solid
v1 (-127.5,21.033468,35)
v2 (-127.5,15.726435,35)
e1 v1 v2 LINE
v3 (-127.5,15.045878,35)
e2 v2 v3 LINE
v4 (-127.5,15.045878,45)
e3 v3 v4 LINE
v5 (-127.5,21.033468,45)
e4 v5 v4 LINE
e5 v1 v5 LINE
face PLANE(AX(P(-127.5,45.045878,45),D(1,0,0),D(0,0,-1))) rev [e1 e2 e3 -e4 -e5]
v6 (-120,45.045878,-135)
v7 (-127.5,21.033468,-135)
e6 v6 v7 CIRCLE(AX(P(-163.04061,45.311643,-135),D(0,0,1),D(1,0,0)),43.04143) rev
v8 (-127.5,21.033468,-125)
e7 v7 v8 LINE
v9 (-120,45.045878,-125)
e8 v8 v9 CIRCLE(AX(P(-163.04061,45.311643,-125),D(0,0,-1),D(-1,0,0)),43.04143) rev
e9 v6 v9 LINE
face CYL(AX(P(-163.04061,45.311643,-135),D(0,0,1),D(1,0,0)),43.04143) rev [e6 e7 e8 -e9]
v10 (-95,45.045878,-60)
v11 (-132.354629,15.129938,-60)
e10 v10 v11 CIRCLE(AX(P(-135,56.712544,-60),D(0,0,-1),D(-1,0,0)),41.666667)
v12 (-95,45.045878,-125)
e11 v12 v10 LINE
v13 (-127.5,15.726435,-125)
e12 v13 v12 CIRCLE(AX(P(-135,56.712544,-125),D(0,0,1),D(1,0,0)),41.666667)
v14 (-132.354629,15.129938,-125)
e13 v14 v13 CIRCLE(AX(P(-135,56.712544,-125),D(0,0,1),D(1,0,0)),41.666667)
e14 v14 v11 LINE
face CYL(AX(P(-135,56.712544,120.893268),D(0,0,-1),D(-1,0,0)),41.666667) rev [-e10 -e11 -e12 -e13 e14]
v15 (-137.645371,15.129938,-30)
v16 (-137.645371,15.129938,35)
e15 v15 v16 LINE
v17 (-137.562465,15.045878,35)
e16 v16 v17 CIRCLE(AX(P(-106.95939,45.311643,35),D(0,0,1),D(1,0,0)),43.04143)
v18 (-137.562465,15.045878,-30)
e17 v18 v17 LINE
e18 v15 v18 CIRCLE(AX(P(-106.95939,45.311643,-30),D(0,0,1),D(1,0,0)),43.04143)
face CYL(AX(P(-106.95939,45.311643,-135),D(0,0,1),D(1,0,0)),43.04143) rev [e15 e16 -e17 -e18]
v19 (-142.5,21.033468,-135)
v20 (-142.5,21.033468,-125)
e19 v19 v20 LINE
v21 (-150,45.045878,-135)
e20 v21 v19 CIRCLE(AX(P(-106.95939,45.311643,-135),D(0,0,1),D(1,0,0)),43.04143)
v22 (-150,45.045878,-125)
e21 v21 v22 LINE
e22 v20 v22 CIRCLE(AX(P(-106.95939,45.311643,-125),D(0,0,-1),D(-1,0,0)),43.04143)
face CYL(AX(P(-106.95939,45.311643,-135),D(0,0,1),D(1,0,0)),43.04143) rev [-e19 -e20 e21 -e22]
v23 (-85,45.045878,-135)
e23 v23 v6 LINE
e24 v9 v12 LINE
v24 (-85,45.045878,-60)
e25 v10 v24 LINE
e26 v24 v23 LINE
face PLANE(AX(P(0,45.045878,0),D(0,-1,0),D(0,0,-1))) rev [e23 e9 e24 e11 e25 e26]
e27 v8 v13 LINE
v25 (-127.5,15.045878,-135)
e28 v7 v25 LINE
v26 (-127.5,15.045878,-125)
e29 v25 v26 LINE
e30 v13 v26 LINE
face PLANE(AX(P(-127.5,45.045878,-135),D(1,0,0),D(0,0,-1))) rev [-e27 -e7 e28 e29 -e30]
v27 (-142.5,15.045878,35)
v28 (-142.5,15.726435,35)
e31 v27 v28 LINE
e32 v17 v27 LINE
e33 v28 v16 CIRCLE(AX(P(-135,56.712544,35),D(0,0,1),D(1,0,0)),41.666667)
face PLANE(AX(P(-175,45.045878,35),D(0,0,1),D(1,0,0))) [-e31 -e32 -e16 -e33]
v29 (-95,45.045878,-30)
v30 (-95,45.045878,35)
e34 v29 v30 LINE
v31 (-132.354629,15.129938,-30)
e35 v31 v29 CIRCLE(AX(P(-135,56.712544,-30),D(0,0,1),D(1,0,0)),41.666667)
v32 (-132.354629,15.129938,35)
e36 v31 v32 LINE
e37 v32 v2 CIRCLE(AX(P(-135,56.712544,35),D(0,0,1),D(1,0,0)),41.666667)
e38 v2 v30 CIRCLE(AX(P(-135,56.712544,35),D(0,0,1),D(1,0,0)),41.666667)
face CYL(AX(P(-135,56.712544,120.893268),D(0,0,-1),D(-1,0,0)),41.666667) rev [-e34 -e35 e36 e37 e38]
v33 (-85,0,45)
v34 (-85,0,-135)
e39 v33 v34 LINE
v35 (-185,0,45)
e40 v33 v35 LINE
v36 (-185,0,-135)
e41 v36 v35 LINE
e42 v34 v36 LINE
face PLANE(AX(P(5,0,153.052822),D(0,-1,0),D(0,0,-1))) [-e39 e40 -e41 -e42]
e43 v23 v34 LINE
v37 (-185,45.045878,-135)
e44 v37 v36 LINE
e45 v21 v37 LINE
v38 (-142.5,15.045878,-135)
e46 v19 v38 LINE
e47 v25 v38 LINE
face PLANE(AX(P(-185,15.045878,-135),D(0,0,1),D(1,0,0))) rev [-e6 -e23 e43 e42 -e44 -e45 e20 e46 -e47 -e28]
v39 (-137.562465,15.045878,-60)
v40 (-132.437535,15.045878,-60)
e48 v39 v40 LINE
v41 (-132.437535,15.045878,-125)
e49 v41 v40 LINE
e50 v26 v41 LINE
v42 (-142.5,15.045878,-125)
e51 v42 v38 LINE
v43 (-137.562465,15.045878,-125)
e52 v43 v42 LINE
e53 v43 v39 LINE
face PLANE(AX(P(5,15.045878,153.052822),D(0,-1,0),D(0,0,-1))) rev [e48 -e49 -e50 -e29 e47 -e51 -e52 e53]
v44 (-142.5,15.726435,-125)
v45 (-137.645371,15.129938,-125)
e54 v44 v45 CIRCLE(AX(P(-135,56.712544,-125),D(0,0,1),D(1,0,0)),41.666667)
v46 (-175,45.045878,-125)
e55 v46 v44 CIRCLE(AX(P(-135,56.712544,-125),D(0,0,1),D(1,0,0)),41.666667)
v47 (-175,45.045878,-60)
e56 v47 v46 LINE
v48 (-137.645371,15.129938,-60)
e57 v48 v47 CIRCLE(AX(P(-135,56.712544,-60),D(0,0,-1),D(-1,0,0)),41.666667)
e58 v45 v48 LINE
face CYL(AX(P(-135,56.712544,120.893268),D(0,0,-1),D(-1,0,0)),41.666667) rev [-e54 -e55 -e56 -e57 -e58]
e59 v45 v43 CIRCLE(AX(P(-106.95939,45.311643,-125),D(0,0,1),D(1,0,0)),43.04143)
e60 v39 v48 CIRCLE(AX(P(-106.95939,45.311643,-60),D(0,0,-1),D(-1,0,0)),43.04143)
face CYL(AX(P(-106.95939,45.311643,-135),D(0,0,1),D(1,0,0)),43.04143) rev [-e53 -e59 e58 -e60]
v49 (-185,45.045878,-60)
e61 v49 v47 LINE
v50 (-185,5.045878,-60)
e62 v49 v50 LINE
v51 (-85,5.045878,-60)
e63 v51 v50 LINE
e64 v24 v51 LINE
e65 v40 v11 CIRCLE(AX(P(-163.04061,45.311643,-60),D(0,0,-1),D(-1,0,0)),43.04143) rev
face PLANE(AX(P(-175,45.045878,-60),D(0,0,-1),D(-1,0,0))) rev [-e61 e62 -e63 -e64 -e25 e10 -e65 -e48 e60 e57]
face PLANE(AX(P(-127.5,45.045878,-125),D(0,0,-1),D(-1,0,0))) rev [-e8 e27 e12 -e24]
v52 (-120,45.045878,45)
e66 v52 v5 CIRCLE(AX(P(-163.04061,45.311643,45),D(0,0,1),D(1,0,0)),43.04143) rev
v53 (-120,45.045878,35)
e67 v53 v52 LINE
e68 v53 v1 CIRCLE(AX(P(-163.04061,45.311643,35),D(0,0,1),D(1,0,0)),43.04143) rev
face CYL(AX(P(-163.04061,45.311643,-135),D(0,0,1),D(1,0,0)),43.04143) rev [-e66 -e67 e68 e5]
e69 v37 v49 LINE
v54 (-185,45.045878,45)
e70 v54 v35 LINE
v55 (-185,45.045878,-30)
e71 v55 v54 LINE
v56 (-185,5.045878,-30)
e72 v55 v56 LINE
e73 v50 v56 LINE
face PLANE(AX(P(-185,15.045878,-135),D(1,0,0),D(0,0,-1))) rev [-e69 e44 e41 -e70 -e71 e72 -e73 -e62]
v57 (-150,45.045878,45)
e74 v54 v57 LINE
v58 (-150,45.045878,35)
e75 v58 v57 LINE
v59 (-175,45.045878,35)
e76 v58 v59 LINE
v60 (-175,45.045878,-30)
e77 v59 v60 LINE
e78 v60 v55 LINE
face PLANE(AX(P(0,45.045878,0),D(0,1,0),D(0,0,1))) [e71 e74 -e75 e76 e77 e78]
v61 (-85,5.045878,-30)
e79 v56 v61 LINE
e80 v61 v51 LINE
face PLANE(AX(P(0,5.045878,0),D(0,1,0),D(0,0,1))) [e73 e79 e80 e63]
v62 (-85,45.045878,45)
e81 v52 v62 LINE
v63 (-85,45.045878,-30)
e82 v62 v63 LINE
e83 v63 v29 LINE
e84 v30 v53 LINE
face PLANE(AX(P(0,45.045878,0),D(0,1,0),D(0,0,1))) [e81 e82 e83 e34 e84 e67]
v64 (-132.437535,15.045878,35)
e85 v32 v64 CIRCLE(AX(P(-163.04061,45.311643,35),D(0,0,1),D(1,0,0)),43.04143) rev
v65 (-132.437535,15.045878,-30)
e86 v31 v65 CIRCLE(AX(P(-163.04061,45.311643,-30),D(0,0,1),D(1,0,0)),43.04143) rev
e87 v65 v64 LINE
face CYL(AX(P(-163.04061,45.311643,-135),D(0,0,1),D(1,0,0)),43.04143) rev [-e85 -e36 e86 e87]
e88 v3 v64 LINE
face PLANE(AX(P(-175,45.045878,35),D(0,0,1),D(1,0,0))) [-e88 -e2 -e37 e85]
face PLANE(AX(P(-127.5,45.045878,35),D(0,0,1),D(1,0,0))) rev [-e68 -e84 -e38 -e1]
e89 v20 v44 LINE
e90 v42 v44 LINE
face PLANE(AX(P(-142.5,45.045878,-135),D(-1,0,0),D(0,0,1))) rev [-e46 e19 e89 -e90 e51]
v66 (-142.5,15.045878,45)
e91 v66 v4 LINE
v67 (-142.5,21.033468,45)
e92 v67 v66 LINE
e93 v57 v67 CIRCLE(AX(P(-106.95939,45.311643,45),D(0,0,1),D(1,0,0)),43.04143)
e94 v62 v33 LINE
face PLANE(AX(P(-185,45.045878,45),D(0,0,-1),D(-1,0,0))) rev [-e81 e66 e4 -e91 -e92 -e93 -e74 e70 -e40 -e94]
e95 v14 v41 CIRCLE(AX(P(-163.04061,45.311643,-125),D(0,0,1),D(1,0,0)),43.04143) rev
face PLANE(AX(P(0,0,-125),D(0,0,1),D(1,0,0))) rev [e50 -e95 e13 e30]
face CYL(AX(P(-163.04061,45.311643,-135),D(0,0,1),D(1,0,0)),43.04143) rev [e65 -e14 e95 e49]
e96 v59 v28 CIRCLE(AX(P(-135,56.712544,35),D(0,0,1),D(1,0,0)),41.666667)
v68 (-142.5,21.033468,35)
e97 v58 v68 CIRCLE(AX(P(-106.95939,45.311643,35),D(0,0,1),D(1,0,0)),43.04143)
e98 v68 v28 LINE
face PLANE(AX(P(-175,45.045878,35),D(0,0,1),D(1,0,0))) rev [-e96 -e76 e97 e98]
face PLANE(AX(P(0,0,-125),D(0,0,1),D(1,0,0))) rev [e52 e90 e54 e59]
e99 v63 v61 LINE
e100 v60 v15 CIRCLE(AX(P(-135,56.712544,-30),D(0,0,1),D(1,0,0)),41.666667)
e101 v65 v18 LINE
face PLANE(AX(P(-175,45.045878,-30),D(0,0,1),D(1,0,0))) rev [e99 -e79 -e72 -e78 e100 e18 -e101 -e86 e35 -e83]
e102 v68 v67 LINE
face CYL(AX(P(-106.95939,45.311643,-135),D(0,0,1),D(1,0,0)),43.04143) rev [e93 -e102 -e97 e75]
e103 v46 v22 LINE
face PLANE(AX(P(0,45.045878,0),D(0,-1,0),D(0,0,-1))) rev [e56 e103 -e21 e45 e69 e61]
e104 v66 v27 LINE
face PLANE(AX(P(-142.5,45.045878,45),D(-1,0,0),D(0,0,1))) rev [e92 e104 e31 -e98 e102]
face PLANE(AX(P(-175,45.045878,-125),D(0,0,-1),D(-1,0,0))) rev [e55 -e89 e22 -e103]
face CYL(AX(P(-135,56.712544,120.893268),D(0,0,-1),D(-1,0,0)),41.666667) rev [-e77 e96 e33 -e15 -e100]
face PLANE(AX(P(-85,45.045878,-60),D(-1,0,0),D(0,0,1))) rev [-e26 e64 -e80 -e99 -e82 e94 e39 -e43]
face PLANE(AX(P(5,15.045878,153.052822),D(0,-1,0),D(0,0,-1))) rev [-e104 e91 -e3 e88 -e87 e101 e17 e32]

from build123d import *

# Parameters (mm, degrees)
BOSS_EXTRUDE1_DEPTH     = 15.045877519
BOSS_EXTRUDE2_DEPTH     = 30
BOSS_EXTRUDE3_DEPTH     = 160
CUT_EXTRUDE1_DEPTH      = 397.42670329
CUT_EXTRUDE1_DEPTH_BACK = 397.42670329
SKETCH5_W               = 30
SKETCH5_H               = 30
CUT_EXTRUDE2_START      = -30
CUT_EXTRUDE2_DEPTH      = 30
CUT_EXTRUDE3_DEPTH      = 10
CUT_EXTRUDE4_DEPTH      = 263.019333412


# Read off the part's stored shape, not the designer's step: Boss-Extrude3
with BuildPart() as part:
    # Sketch1 → Boss-Extrude1 (new body)
    with BuildSketch(Plane(origin=(0, 0, 0), x_dir=(1, 0, 0), z_dir=(0, 1, 0))):
        with BuildLine():
            Line((-185, -65), (5, -65))
            ThreePointArc((5, -65), (60.514401442, -84.704810384), (91.182336182, -135))
            Line((91.182336182, -135), (185, -135))
            Line((185, -135), (185, 135))
            Line((185, 135), (-185, 135))
            Line((-185, 135), (-185, -65))
        make_face()
    extrude(amount=BOSS_EXTRUDE1_DEPTH)

    # Sketch2 → Boss-Extrude2 (add)
    with BuildSketch(Plane(origin=(0, 15.045877519, 0), x_dir=(1, 0, 0), z_dir=(0, 1, 0))):
        Polygon((-175, -35), (-175, 30), (-185, 30), (-185, -45), (-142.5, -45), (-142.5, -35), align=None)
        Polygon((-175, 125), (-142.5, 125), (-142.5, 135), (-185, 135), (-185, 60), (-175, 60), align=None)
        Polygon((-95, -35), (-95, 30), (-85, 30), (-85, -45), (-127.5, -45), (-127.5, -35), align=None)
        Polygon((-127.5, 135), (-127.5, 125), (-95, 125), (-95, 60), (-85, 60), (-85, 135), align=None)
    extrude(amount=BOSS_EXTRUDE2_DEPTH)

    # Boss-Extrude3 outline → Boss-Extrude3 (add)
    with BuildSketch(Plane.XY.offset(-125)):
        with BuildLine():
            ThreePointArc((-95, 45.045877519), (-110, 23.379210852), (-135, 15.045877519))
            Line((-135, 15.045877519), (-95, 15.045877519))
            Line((-95, 15.045877519), (-95, 45.045877519))
        make_face()
        with BuildLine():
            Line((-175, 45.045877519), (-175, 15.045877519))
            Line((-175, 15.045877519), (-135, 15.045877519))
            ThreePointArc((-135, 15.045877519), (-160, 23.379210852), (-175, 45.045877519))
        make_face()
    extrude(amount=BOSS_EXTRUDE3_DEPTH)

    # Sketch5 → Cut-Extrude1 (cut, two sides: drawn at the far end of the back side and taken through both)
    with BuildSketch(Plane.ZY.offset(185).offset(-CUT_EXTRUDE1_DEPTH_BACK)):
        with Locations((-45, 30.045877519)):
            Rectangle(SKETCH5_W, SKETCH5_H)
    extrude(amount=CUT_EXTRUDE1_DEPTH + CUT_EXTRUDE1_DEPTH_BACK, mode=Mode.SUBTRACT)

    # Sketch6 → Cut-Extrude2 (cut)
    with BuildSketch(Plane(origin=(0, 15.045877519, 0), x_dir=(1, 0, 0), z_dir=(0, 1, 0)).offset(CUT_EXTRUDE2_START)):
        with BuildLine():
            Line((-142.5, -45), (-127.5, -45))
            Line((-127.5, -45), (-85, -45))
            Line((-85, -45), (-85, 30))
            Line((-85, 30), (-85, 60))
            Line((-85, 60), (-85, 135))
            Line((-85, 135), (185, 135))
            Line((185, 135), (185, -135))
            Line((185, -135), (91.182336182, -135))
            ThreePointArc((91.182336182, -135), (60.514401442, -84.704810384), (5, -65))
            Line((5, -65), (-185, -65))
            Line((-185, -65), (-185, -45))
            Line((-185, -45), (-142.5, -45))
        make_face()
    extrude(amount=CUT_EXTRUDE2_DEPTH, mode=Mode.SUBTRACT)

    # Sketch8 → Cut-Extrude3 (cut)
    with BuildSketch(Plane(origin=(0, 15.045877519, 0), x_dir=(1, 0, 0), z_dir=(0, 1, 0))):
        Polygon((-135, 30), (-85, 30), (-85, 60), (-135, 60), (-185, 60), (-185, 30), align=None)
    extrude(amount=-CUT_EXTRUDE3_DEPTH, mode=Mode.SUBTRACT)

    # Sketch9 → Cut-Extrude4 (cut, through all)
    with BuildSketch(Plane.XY.offset(45)):
        with BuildLine():
            Line((-150, 45.045877519), (-120, 45.045877519))
            ThreePointArc((-120, 45.045877519), (-123.28072965, 28.827812568), (-132.437534993, 15.045877519))
            Line((-132.437534993, 15.045877519), (-137.562465007, 15.045877519))
            ThreePointArc((-137.562465007, 15.045877519), (-146.71927035, 28.827812568), (-150, 45.045877519))
        make_face()
    extrude(amount=-CUT_EXTRUDE4_DEPTH, mode=Mode.SUBTRACT)


solid = part.part
